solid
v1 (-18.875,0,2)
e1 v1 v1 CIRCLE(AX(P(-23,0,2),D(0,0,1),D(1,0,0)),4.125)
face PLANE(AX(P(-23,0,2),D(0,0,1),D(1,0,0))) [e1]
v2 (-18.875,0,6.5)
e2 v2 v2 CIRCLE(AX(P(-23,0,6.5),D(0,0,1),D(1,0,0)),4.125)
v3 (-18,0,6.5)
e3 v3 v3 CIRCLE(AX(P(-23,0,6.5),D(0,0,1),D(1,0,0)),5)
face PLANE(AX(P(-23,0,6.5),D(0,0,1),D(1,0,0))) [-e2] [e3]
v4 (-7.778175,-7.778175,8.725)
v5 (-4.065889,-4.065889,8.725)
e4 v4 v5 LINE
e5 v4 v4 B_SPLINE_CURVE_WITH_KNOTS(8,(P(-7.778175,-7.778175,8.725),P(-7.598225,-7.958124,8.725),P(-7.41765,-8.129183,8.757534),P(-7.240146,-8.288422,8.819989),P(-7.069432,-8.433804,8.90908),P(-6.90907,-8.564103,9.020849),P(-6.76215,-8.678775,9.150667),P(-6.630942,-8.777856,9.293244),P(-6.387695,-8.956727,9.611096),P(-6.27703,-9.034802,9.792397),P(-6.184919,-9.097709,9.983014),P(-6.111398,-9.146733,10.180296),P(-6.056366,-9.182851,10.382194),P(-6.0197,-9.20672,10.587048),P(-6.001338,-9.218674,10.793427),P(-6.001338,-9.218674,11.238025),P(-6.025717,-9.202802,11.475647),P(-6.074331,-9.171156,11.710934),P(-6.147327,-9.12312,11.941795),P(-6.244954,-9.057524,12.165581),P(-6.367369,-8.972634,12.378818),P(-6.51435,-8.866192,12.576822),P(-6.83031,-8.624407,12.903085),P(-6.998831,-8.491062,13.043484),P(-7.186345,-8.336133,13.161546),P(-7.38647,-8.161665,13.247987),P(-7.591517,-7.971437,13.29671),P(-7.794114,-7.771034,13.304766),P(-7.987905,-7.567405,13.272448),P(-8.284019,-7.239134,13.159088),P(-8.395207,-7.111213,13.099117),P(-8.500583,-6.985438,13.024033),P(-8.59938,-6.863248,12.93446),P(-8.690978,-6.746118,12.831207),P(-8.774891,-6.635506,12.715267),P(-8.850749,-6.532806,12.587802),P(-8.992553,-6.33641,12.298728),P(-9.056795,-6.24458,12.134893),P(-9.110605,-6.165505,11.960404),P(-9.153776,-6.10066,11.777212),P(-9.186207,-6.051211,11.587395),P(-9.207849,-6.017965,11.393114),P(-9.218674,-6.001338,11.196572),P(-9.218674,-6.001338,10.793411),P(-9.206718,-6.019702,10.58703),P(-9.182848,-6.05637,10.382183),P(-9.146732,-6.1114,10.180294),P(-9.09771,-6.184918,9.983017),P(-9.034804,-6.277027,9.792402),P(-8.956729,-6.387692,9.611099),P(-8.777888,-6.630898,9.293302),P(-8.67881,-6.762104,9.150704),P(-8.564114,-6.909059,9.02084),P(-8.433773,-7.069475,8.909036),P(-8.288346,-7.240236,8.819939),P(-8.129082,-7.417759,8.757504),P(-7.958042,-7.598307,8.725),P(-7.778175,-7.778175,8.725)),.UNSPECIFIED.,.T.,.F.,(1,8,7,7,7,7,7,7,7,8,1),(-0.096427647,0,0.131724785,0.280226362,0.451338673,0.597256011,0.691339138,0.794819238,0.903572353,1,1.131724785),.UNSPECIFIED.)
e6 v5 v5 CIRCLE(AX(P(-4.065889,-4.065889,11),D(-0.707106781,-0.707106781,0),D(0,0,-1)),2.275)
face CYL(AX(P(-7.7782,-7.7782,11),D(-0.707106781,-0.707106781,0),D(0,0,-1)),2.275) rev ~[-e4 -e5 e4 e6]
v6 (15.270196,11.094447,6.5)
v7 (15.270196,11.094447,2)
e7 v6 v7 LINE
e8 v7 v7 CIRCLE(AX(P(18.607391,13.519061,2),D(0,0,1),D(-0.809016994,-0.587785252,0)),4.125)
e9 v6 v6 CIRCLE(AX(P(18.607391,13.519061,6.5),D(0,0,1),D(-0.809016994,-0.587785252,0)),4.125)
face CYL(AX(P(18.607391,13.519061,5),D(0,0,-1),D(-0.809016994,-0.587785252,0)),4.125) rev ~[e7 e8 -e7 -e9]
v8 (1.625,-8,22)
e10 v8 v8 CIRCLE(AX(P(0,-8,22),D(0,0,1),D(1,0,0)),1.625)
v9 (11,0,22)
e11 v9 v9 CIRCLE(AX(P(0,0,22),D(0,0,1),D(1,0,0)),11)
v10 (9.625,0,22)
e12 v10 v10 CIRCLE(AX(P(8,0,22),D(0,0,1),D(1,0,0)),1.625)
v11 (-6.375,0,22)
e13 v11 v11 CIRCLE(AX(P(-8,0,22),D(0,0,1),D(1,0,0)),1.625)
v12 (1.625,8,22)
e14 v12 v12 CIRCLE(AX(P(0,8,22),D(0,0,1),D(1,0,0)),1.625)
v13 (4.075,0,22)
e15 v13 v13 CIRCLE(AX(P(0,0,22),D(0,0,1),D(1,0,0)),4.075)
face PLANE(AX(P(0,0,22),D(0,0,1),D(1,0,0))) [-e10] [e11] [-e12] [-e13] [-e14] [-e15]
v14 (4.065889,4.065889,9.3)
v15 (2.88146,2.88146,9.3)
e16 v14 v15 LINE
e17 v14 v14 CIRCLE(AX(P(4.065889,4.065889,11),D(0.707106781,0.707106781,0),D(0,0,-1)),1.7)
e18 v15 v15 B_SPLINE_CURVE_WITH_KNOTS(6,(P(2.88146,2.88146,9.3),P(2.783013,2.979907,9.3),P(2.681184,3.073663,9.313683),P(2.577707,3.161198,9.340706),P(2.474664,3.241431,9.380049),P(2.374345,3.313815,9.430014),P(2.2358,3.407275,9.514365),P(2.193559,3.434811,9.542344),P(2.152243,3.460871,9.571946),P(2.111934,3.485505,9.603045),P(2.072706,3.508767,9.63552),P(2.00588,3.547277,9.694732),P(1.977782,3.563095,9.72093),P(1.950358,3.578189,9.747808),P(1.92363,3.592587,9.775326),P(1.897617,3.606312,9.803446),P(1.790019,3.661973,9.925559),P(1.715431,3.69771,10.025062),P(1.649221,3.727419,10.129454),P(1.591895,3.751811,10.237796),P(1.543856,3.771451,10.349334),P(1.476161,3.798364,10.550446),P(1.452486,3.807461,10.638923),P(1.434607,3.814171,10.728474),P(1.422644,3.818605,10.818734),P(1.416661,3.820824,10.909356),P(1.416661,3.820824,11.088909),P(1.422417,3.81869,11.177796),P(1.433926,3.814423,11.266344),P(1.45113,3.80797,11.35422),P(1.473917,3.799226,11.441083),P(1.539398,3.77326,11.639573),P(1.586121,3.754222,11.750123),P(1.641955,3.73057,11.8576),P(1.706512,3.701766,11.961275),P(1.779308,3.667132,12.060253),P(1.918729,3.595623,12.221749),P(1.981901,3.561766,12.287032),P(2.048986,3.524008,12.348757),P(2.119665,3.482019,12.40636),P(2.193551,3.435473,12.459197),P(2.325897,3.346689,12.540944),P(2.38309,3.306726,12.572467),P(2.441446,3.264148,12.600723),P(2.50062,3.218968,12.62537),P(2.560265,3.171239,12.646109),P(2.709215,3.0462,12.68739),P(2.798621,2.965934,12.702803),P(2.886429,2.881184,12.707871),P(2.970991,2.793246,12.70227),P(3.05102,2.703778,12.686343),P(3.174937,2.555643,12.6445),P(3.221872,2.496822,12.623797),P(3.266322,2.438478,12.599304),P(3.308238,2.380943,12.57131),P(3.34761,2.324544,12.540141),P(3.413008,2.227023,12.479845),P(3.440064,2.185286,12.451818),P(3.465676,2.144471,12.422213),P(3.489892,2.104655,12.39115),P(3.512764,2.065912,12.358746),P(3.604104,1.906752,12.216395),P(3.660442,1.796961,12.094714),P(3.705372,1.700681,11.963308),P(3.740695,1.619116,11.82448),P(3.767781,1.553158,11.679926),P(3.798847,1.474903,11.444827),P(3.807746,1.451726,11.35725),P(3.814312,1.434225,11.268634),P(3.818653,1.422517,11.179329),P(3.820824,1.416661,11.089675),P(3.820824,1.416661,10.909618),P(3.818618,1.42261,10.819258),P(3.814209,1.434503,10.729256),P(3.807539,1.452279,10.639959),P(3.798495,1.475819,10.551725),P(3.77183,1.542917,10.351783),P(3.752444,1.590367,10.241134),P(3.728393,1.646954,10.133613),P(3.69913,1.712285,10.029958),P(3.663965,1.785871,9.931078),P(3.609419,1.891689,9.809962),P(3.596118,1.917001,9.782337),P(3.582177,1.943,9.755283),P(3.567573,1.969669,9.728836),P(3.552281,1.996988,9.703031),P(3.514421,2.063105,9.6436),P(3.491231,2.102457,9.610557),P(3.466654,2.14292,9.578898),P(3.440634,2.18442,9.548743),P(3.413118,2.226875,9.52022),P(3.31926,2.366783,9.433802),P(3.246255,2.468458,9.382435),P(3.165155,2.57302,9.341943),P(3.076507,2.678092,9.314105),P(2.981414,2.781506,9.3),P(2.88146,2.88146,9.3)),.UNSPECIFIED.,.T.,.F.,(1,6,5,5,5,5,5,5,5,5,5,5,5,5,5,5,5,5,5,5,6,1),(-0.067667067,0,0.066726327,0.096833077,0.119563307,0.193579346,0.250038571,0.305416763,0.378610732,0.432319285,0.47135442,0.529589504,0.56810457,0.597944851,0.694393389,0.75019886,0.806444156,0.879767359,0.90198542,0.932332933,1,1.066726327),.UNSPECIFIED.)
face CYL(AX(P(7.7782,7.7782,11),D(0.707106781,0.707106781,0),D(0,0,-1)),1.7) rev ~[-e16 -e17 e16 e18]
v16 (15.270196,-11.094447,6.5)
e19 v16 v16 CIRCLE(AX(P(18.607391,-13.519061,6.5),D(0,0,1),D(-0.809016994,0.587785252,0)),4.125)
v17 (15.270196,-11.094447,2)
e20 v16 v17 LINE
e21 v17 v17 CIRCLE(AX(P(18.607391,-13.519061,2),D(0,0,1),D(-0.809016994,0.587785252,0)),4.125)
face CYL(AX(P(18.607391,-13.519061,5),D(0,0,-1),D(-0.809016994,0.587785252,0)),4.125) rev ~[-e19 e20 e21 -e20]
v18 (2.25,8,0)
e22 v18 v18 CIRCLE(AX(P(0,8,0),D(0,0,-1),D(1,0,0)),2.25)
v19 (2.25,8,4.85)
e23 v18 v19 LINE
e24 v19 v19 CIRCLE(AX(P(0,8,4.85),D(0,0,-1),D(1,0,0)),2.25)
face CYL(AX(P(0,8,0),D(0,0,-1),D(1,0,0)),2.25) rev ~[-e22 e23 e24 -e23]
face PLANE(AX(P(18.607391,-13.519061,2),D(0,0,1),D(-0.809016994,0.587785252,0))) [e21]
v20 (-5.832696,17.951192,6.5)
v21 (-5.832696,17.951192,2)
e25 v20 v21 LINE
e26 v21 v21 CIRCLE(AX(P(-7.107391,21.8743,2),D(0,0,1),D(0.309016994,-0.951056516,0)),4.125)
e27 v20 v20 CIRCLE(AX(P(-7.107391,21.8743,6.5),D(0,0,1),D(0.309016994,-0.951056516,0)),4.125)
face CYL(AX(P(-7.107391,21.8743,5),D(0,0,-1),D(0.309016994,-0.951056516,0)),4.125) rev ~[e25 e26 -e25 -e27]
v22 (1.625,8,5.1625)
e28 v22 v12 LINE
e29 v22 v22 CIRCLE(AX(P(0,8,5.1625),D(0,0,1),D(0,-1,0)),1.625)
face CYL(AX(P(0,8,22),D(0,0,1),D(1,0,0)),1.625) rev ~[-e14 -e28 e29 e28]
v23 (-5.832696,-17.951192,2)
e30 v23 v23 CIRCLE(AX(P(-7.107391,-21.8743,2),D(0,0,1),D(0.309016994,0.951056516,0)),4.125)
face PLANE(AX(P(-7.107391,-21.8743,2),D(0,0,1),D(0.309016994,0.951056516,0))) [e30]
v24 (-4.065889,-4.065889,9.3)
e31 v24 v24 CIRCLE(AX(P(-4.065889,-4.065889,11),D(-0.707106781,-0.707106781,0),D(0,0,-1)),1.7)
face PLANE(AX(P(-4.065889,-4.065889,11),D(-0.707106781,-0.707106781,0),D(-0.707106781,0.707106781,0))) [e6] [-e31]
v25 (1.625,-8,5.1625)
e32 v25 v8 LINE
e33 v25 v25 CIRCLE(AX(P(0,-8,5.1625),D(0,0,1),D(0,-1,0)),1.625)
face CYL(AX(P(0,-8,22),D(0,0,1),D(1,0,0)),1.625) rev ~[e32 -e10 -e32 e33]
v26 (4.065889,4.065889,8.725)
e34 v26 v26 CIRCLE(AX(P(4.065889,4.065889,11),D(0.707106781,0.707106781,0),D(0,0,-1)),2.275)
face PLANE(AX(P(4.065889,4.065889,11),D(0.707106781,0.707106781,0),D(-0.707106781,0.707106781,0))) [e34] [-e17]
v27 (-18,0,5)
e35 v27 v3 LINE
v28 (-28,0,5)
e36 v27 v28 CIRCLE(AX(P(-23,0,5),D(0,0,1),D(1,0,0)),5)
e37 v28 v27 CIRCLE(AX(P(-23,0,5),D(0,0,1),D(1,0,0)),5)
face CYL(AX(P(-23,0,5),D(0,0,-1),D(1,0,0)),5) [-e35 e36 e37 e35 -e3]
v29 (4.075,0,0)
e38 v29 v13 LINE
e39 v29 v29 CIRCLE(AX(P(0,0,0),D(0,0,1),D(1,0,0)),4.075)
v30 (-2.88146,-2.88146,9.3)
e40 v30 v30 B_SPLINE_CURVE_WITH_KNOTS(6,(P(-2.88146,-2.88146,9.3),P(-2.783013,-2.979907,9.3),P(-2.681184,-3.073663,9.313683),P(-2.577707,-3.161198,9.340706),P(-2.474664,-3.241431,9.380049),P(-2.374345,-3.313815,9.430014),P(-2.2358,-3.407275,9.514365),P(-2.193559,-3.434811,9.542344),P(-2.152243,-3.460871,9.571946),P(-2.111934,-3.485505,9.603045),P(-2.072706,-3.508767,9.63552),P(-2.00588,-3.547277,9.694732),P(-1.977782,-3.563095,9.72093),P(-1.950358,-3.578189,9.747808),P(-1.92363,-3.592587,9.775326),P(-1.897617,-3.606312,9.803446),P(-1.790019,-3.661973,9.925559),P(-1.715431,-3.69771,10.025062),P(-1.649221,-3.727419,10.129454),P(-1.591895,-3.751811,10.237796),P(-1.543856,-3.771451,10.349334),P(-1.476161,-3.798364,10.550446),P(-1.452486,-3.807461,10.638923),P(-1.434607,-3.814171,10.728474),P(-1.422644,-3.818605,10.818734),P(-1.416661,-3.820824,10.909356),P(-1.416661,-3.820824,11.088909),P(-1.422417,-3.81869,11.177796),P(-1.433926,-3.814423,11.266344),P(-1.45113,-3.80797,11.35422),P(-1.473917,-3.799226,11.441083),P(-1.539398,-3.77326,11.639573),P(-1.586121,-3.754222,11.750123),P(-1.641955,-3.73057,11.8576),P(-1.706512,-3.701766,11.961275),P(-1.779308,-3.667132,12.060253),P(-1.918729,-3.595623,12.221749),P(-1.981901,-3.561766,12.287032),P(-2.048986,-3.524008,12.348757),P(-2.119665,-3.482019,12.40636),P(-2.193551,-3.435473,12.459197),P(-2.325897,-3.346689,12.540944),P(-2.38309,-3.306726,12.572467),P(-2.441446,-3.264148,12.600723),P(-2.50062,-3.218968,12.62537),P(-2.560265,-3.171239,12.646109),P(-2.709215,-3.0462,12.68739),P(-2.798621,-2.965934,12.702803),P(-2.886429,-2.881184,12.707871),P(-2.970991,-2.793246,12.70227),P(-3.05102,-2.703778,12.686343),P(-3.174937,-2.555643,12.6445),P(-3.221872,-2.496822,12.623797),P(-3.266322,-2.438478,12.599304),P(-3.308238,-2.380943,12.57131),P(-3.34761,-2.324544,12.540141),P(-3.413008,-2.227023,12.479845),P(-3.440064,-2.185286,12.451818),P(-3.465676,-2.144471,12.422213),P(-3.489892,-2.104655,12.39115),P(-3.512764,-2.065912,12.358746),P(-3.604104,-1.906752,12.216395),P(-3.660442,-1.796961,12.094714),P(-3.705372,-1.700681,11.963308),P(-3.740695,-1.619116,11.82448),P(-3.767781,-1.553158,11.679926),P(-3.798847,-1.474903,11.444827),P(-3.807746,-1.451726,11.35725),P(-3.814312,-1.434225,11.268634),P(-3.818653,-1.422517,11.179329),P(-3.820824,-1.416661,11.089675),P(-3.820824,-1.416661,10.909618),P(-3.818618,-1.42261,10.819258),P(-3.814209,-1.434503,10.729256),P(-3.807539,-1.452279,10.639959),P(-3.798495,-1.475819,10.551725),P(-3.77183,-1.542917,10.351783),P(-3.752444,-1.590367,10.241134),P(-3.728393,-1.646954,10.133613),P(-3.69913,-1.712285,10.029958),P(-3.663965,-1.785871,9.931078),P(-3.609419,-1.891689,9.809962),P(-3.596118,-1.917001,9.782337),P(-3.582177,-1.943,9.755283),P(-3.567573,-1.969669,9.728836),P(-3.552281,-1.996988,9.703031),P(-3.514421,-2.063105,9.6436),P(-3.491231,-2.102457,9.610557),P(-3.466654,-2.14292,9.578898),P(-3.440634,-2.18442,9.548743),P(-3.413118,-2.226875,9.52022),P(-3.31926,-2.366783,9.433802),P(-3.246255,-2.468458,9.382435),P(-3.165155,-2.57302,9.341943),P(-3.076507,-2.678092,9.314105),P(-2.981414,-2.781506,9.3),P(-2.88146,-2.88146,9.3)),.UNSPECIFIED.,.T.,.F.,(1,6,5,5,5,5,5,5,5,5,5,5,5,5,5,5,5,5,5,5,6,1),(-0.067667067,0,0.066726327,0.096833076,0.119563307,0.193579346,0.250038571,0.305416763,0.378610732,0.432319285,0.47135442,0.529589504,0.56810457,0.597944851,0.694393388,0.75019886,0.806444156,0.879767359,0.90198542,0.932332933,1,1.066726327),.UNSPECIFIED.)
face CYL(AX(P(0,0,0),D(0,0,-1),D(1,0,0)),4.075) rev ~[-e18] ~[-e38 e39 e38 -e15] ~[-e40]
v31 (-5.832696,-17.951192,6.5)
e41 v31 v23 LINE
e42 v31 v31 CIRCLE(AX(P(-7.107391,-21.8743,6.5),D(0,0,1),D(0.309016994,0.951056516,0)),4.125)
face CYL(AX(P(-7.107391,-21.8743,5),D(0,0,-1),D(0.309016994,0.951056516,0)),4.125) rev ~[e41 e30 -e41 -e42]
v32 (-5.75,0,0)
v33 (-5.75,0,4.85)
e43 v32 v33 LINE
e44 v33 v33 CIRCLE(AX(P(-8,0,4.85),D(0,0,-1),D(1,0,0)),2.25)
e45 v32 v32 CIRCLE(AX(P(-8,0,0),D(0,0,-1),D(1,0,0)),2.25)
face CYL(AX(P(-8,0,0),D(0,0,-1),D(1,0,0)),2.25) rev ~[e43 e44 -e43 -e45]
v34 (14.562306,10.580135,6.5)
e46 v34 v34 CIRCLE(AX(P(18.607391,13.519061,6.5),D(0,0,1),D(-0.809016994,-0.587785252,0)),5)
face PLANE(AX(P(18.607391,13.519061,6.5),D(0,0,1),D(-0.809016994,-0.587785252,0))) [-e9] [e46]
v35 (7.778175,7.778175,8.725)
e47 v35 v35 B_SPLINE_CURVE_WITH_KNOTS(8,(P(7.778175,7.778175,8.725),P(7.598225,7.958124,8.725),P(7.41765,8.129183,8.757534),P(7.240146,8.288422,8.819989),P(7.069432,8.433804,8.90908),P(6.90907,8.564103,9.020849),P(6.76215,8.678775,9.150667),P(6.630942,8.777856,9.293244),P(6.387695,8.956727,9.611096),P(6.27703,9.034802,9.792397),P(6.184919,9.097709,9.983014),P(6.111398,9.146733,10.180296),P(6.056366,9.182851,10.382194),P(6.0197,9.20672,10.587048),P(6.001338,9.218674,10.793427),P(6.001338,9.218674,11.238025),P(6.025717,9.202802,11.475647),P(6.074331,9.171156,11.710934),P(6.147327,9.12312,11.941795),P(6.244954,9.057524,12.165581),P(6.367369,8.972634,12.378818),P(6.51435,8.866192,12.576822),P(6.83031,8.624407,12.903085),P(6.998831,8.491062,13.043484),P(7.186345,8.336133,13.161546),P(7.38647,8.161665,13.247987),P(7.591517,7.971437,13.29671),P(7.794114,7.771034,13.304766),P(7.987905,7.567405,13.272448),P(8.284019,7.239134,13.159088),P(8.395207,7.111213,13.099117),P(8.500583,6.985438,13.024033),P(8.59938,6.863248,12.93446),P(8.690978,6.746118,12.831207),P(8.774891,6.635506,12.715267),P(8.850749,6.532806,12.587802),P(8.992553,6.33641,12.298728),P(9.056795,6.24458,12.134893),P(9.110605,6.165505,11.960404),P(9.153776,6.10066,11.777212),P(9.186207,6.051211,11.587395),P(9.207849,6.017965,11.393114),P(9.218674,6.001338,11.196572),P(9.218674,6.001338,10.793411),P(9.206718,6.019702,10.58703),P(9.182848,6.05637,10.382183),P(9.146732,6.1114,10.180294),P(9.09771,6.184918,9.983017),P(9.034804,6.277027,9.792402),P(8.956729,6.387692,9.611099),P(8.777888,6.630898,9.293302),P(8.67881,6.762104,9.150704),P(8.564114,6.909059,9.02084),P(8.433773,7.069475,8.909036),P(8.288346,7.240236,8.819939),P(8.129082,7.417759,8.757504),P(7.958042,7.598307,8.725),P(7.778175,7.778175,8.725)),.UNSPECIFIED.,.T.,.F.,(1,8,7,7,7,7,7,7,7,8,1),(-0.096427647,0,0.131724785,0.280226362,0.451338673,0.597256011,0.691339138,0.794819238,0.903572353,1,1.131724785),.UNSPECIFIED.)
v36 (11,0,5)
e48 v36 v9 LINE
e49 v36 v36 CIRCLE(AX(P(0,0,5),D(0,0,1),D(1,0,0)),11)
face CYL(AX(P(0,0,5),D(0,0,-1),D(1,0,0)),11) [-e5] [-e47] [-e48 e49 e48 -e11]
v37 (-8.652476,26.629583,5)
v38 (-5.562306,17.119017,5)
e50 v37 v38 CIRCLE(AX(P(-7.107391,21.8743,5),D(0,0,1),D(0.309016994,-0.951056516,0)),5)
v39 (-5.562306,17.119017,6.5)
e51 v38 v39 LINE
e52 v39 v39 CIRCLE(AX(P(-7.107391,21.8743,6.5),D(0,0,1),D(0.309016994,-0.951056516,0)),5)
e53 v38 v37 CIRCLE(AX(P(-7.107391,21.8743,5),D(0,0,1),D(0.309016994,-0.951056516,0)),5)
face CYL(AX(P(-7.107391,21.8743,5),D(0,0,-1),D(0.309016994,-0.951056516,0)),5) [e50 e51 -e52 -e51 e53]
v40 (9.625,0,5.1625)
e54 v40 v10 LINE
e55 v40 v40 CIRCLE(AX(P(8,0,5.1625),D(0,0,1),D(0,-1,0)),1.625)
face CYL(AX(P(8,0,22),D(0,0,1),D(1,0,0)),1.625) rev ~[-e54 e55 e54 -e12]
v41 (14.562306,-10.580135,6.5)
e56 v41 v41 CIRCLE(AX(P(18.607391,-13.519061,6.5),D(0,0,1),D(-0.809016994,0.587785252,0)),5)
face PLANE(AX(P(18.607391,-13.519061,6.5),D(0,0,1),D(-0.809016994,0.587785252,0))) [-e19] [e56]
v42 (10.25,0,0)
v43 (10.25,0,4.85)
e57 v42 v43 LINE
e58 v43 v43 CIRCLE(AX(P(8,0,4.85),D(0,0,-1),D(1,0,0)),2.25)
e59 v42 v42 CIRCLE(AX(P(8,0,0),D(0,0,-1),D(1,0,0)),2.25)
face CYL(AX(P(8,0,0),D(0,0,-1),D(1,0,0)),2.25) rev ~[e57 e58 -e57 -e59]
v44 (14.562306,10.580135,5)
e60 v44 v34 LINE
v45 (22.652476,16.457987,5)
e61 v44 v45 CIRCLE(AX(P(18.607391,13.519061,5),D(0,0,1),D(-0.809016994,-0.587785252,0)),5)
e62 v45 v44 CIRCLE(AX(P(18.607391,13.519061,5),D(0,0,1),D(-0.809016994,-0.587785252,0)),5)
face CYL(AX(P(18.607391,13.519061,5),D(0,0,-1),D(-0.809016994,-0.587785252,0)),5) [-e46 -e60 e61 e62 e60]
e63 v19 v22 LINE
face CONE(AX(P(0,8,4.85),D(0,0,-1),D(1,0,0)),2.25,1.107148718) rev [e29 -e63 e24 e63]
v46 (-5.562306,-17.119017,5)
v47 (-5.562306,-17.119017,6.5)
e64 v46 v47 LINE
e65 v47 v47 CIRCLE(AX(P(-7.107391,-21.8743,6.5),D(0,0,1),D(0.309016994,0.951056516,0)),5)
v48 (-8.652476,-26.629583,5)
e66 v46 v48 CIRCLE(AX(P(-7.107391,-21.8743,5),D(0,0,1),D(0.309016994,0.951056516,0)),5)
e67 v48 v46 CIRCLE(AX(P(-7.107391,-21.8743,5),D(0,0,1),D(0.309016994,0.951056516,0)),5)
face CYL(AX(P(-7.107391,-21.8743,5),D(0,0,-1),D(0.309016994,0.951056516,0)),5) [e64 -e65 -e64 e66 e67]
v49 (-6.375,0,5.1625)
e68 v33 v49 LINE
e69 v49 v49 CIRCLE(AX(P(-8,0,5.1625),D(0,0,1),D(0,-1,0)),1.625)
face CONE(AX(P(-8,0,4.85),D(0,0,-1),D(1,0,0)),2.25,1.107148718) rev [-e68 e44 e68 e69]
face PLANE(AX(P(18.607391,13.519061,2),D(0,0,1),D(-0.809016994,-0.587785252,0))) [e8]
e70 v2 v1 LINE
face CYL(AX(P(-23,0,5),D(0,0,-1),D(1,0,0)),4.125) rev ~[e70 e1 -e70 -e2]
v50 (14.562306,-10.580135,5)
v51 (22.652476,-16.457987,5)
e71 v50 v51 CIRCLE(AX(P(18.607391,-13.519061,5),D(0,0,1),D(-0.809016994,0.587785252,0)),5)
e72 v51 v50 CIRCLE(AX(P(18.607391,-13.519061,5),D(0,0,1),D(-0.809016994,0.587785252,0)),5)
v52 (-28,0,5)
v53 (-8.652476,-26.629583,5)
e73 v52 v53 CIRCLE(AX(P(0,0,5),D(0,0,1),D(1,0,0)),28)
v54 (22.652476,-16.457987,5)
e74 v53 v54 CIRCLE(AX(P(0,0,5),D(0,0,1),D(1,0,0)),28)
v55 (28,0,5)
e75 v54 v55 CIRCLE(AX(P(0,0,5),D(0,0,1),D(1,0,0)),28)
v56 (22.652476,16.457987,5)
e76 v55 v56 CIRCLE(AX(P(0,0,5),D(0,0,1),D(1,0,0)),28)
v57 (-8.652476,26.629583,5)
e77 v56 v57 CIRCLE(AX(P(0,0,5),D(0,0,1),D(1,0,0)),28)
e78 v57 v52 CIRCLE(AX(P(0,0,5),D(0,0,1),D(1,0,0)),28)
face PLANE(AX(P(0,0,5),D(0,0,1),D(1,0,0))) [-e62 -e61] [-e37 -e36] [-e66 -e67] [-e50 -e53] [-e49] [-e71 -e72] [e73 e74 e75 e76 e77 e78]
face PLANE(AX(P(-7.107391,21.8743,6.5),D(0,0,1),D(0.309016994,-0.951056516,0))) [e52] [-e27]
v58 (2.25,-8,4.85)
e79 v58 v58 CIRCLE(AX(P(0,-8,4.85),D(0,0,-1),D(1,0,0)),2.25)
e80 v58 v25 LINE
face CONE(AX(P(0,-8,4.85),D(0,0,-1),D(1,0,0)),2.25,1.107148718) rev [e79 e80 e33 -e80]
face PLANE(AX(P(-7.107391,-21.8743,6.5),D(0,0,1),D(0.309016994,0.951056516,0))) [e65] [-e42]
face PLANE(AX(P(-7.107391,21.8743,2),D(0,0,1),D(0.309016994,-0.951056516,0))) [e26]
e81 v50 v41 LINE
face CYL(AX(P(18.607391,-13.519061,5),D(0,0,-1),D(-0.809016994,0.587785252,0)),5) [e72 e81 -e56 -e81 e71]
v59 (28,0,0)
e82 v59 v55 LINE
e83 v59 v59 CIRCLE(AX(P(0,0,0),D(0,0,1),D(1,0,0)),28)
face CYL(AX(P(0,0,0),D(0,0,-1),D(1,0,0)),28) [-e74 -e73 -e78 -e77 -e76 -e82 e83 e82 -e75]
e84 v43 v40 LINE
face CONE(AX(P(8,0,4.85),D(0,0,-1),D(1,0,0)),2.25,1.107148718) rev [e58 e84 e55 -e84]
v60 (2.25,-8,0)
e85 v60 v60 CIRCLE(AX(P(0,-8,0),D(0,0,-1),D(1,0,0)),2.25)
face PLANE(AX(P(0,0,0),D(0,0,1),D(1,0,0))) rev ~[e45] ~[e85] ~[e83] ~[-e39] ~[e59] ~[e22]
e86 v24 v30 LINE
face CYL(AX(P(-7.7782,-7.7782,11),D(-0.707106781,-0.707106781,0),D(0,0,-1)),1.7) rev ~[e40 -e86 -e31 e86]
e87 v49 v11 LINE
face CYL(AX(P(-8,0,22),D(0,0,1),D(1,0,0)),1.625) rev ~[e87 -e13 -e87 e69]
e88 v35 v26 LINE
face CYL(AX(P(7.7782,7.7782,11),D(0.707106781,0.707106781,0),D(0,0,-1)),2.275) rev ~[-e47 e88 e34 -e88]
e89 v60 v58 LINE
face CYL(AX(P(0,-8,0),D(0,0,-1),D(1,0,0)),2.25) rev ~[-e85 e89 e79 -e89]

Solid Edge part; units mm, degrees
sketch "Sketch1" plane through (0, 0, 0) normal (0, 0, 1) x (1, 0, 0)
  circle A0 centre (0, 0) radius 28
  circle A1 centre (0, 0) radius 4.075
extrude "Protrusion1" add sketch "Sketch1" along normal blind 5
sketch "Sketch2" plane through (0, 0, 5) normal (0, 0, 1) x (1, 0, 0)
  circle A0 centre (-23, 0) radius 4.125
extrude "ExtrudedCutout_1" cut sketch "Sketch2" against normal blind 3
sketch "Sketch3" plane through (0, 0, 5) normal (0, 0, 1) x (1, 0, 0)
  circle A0 centre (-23, 0) radius 5
  circle A1 centre (-23, 0) radius 4.125
  dimension "D1" = 23
extrude "ExtrudedProtrusion_2" add sketch "Sketch3" along normal blind 1.5
sketch "Sketch4" plane through (0, 0, 5) normal (0, 0, 1) x (1, 0, 0)
  circle A0 centre (0, 0) radius 4.075
  circle A1 centre (0, 0) radius 11
extrude "ExtrudedProtrusion_3" add sketch "Sketch4" along normal blind 17
pattern_circular "Pattern1" count 5 over 360 about axis through (0, 0, 0) along (0, 0, -1) of "ExtrudedCutout_1", "ExtrudedProtrusion_2"
sketch "Sketch5" plane through (0, 0, 22) normal (0, 0, 1) x (1, 0, 0)
  circle A0 centre (-8, 0) radius 1.625
  circle A1 centre (0, 8) radius 1.625
  circle A2 centre (8, 0) radius 1.625
  circle A3 centre (0, -8) radius 1.625
  dimension "D1" = 8
  dimension "D2" = 8
  dimension "D3" = 8
  dimension "D4" = 8
extrude "Cutout1" cut sketch "Sketch5" against normal up to next
sketch "Sketch6" plane through (0, 0, 0) normal (0, 0, -1) x (1, 0, 0)
  circle A0 centre (8, 0) radius 2.25
  circle A1 centre (8, 0) radius 1.625
  circle A2 centre (0, -8) radius 2.25
  circle A3 centre (0, -8) radius 1.625
  circle A4 centre (0, 8) radius 2.25
  circle A5 centre (0, 8) radius 1.625
  circle A6 centre (-8, 0) radius 2.25
  circle A7 centre (-8, 0) radius 1.625
extrude "Cutout2" cut sketch "Sketch6" against normal blind 5.25
chamfer "Chamfer_3" distance 0.8 distance2 0.4 4 edges at (-2.25, -8, 5.25) (5.75, 0, 5.25) (-2.25, 8, 5.25) (-10.25, 0, 5.25) measured on face at (1.545, -9.455, 5.25) measured on face at (-6.455, -1.455, 5.25) measured on face at (9.545, -1.455, 5.25) measured on face at (1.545, 6.545, 5.25) measured on face at (1.545, -9.455, 5.25) measured on face at (-6.455, -1.455, 5.25) measured on face at (9.545, -1.455, 5.25) measured on face at (1.545, 6.545, 5.25) measured on face at (1.545, -9.455, 5.25) measured on face at (-6.455, -1.455, 5.25) measured on face at (9.545, -1.455, 5.25) measured on face at (1.545, 6.545, 5.25) measured on face at (1.545, -9.455, 5.25) measured on face at (-6.455, -1.455, 5.25) measured on face at (9.545, -1.455, 5.25) measured on face at (1.545, 6.545, 5.25)
sketch "Sketch7" plane through (7.7782, 7.7782, 13.5) normal (0.7071068, 0.7071068, 0) x (0, 0, -1)
  circle A0 centre (2.5, 0) radius 1.7
extrude "Cutout3" cut sketch "Sketch7" against normal up to next
sketch "Sketch8" plane through (7.7782, 7.7782, 13.5) normal (0.7071068, 0.7071068, 0) x (0, 0, -1)
  circle A0 centre (2.5, 0) radius 1.7
  circle A1 centre (2.5, 0) radius 2.275
extrude "ExtrudedProtrusion_7" cut sketch "Sketch8" against normal blind 5.25
sketch "Sketch9" plane through (-7.7782, -7.7782, 13.5) normal (-0.7071068, -0.7071068, 0) x (0, 0, -1)
  circle A0 centre (2.5, 0) radius 1.7
  circle A1 centre (2.5, 0) radius 2.275
extrude "ExtrudedCutout_12" cut sketch "Sketch9" against normal blind 5.25
sketch "Sketch10" plane through (-7.7782, -7.7782, 13.5) normal (-0.7071068, -0.7071068, 0) x (0, 0, -1)
  circle A0 centre (2.5, 0) radius 1.7
extrude "Cutout4" cut sketch "Sketch10" against normal up to next
